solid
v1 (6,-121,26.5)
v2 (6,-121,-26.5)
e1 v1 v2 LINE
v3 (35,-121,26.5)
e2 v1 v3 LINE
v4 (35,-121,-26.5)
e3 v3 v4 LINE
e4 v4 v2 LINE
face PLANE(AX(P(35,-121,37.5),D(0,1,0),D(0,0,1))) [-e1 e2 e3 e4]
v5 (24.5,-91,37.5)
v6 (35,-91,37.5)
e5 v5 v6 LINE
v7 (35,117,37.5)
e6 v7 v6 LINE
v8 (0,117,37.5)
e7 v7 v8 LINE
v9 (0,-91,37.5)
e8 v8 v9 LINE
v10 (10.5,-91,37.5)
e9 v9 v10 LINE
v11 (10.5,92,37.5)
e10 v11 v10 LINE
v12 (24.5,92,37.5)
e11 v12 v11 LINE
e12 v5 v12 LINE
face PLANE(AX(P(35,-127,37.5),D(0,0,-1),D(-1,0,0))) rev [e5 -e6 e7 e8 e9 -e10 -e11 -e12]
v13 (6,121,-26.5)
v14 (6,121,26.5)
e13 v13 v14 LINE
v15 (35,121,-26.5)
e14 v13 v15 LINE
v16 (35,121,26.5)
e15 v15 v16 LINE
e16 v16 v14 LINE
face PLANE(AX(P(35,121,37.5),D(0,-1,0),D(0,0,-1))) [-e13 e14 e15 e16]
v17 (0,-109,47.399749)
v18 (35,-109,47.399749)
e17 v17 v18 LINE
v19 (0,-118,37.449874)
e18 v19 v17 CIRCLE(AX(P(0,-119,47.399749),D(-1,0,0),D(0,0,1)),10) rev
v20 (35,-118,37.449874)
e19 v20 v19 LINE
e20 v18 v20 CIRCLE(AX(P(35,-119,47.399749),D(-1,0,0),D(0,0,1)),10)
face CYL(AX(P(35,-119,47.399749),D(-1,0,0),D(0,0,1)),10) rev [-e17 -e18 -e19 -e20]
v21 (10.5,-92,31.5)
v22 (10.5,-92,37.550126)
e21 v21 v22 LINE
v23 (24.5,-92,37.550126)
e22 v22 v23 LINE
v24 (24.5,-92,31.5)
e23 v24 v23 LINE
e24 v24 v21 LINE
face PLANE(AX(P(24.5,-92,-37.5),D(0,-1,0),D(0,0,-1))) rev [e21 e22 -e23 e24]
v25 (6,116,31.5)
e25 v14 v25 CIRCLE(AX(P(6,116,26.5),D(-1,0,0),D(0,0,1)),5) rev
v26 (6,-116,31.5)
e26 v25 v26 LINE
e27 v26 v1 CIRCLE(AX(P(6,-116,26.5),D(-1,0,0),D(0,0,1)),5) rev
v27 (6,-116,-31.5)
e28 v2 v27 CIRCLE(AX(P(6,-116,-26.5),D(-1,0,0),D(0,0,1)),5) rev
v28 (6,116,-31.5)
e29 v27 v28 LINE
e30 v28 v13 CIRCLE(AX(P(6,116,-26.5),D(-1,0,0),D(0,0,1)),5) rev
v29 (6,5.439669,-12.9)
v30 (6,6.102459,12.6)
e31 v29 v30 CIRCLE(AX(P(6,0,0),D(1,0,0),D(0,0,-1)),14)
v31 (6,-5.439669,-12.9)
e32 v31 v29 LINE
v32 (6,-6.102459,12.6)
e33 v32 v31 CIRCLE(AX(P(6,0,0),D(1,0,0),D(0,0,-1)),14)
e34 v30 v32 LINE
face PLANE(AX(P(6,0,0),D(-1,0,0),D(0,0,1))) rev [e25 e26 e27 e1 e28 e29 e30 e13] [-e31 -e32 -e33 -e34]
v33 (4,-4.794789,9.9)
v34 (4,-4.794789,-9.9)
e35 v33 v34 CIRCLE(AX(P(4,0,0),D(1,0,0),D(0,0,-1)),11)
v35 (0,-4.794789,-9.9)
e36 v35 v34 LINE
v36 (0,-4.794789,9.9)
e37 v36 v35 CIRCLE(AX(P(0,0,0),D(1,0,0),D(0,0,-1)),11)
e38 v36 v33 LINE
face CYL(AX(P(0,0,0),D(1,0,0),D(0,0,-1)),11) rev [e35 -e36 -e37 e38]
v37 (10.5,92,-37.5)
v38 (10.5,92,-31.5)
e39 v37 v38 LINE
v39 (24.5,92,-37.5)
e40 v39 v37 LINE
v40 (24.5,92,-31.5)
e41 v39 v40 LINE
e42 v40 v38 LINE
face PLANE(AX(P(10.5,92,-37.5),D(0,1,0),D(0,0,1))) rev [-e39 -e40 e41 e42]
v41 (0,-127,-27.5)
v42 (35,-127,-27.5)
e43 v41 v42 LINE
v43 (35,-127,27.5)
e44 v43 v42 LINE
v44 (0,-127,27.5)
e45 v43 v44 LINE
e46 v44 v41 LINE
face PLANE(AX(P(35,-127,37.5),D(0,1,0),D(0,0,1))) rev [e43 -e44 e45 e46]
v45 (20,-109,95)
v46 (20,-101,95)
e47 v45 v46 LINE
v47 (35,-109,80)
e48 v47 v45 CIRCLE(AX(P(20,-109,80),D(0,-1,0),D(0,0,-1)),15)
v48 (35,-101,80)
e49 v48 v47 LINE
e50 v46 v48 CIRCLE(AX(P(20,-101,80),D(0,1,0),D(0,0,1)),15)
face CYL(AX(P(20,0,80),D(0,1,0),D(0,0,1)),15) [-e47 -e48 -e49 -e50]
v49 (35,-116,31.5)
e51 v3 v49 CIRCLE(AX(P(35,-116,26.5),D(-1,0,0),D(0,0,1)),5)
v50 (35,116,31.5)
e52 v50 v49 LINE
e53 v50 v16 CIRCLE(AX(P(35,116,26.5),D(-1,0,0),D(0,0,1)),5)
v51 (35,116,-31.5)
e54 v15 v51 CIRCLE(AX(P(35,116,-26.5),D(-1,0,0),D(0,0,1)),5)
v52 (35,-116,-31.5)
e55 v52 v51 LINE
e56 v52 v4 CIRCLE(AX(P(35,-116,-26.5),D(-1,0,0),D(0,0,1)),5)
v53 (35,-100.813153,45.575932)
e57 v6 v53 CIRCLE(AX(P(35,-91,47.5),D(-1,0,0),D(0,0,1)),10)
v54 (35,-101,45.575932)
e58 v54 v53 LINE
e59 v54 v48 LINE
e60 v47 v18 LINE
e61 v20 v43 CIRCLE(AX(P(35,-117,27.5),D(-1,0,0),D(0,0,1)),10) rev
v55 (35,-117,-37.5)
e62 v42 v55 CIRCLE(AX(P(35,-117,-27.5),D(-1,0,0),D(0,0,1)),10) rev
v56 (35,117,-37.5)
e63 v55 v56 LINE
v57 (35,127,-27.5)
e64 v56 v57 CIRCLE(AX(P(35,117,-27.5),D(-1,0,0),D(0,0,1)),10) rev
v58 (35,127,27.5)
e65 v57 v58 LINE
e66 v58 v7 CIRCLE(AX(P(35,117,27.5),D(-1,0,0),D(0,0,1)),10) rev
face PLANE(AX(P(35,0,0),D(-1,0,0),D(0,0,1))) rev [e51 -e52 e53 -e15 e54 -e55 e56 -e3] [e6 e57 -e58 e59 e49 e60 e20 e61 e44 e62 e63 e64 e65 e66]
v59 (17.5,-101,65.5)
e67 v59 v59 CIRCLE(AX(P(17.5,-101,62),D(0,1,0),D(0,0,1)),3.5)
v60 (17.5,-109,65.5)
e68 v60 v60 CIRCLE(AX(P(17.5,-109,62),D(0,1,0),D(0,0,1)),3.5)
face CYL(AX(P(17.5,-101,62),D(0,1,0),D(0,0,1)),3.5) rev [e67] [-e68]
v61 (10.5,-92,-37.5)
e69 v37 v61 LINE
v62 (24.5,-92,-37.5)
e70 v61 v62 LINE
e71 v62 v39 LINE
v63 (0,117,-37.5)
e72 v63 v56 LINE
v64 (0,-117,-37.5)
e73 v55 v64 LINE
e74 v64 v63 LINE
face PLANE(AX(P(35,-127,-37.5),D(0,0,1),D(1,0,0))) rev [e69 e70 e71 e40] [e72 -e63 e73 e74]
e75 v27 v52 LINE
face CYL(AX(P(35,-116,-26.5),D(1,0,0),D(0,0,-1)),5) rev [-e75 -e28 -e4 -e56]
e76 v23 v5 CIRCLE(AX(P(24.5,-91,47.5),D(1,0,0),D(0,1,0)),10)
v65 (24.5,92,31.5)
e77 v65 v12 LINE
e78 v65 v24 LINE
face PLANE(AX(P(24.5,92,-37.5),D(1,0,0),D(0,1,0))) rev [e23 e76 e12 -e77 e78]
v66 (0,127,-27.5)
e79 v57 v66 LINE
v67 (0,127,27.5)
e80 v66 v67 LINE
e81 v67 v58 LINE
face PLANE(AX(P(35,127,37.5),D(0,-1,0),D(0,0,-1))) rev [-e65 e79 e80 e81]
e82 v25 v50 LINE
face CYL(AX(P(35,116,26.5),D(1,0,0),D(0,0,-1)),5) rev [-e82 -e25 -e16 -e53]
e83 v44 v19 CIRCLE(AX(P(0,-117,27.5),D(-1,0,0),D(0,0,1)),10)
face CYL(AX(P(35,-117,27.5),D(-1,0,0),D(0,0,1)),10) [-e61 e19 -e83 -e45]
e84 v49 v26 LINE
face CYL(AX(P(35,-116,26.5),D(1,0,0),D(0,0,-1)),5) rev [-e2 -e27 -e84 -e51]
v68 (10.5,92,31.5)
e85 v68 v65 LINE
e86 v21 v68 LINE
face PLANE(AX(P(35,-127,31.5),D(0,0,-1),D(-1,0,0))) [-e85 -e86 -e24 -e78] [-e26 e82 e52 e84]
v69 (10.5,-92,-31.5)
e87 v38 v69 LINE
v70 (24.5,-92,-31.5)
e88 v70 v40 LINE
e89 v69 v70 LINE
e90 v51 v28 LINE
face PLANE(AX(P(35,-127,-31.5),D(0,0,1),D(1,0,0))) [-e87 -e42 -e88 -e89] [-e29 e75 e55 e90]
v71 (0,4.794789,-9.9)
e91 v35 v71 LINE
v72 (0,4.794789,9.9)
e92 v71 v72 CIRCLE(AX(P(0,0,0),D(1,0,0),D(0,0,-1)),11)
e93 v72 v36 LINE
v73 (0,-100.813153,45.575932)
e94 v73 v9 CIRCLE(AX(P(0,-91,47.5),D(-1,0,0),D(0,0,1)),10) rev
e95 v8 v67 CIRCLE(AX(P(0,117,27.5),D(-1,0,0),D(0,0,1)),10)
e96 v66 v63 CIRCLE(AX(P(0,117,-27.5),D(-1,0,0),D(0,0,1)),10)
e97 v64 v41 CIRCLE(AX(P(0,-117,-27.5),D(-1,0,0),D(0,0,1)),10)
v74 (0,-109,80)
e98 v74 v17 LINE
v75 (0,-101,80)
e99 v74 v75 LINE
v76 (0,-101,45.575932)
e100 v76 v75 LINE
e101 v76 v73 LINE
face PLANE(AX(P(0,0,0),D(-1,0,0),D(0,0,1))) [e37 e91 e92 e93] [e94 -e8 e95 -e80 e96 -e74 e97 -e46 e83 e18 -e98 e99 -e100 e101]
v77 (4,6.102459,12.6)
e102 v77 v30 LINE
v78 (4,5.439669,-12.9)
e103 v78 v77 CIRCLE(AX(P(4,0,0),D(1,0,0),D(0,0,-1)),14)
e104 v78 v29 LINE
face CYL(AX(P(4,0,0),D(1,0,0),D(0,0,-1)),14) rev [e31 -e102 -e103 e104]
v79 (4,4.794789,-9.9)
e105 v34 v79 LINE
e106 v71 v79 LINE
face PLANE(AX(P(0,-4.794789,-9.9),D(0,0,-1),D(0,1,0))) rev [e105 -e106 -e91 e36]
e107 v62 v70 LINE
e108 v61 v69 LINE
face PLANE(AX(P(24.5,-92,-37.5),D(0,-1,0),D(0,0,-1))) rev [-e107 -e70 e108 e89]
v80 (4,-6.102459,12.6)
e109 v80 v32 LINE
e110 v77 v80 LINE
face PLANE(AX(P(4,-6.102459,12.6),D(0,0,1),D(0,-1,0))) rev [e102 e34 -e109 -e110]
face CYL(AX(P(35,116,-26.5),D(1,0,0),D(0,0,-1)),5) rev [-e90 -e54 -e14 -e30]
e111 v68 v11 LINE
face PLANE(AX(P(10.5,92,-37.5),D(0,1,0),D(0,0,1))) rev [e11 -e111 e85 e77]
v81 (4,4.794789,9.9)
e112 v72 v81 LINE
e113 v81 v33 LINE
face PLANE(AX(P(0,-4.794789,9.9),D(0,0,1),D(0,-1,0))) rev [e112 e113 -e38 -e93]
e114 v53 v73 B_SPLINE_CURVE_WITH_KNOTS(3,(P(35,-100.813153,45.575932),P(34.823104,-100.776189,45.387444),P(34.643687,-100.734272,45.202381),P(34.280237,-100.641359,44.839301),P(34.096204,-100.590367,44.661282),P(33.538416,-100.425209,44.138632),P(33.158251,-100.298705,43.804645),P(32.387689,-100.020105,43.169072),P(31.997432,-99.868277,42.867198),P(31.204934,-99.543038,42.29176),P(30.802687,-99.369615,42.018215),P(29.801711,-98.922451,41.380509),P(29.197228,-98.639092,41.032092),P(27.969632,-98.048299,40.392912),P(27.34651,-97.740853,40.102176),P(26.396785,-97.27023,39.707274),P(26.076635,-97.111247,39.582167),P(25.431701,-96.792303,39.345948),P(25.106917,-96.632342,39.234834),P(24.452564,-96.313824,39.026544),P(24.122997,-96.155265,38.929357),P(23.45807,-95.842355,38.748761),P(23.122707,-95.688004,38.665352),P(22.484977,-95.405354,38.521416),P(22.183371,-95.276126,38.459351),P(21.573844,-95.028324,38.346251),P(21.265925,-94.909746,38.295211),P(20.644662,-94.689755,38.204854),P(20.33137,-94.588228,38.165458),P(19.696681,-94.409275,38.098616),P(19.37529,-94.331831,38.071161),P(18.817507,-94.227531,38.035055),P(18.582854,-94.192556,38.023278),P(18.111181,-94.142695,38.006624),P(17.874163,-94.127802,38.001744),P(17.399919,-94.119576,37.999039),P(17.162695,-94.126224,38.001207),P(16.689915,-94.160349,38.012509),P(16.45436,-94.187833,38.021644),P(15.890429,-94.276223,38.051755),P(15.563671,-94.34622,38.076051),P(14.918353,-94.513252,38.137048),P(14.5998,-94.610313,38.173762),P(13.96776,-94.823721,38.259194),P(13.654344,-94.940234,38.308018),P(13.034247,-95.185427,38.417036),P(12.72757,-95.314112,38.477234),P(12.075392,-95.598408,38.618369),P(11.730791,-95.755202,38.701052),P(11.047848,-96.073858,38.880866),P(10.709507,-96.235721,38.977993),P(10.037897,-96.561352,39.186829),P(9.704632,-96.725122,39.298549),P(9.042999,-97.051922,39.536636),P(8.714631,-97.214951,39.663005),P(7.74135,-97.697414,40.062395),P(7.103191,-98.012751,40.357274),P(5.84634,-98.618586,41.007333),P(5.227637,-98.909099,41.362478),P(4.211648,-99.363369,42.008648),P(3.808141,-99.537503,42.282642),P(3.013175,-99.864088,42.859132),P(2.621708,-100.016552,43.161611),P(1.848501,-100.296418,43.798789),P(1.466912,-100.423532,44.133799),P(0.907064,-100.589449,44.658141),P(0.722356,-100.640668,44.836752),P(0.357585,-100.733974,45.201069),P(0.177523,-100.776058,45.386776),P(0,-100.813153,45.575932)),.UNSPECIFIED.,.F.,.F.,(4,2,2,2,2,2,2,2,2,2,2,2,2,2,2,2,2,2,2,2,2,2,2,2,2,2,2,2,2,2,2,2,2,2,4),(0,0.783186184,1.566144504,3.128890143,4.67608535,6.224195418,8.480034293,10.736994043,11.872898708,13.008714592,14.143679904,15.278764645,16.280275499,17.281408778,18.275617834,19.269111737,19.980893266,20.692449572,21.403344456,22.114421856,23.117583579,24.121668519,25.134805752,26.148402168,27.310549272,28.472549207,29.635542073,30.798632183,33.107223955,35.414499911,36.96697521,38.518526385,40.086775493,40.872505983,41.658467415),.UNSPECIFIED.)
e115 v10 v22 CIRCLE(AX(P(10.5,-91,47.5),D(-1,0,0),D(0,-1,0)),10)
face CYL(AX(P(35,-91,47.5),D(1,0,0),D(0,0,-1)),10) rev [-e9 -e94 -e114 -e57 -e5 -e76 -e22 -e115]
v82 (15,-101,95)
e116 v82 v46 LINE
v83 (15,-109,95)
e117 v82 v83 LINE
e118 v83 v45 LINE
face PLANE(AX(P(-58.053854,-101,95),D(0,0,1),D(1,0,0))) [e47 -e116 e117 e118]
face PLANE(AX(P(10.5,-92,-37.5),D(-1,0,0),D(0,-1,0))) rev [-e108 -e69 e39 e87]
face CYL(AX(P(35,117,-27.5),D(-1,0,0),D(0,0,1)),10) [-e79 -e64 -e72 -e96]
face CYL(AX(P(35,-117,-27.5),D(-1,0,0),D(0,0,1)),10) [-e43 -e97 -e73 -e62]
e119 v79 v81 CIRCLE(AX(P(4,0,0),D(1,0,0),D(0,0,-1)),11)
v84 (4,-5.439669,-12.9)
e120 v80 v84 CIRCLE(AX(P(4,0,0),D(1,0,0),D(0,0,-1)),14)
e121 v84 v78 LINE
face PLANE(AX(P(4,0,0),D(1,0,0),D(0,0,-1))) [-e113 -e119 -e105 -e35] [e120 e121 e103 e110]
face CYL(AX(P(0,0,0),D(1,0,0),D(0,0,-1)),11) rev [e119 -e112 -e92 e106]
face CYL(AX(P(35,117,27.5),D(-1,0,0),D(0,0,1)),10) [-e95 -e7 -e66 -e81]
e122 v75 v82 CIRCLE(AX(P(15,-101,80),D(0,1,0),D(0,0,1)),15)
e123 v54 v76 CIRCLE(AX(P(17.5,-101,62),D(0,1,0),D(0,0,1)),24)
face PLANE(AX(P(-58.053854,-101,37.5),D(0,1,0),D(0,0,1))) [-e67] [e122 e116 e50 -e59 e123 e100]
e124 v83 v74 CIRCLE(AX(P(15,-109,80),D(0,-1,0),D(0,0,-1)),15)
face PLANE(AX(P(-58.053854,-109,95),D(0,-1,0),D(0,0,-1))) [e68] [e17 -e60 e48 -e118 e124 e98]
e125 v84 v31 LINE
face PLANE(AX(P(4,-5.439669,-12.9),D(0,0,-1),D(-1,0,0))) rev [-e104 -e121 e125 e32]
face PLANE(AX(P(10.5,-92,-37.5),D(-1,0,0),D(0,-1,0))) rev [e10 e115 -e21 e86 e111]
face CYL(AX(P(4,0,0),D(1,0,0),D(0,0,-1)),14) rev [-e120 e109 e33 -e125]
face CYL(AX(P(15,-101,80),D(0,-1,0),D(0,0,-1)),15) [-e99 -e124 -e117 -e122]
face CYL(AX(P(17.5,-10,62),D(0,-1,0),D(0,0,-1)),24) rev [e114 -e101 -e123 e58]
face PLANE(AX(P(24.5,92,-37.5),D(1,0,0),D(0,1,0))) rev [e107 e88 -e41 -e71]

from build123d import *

# Parameters (mm, degrees)
SKETCH3_W                 = 75
SKETCH3_H                 = 254
BOSS_EXTRUDE2_DEPTH       = 35
SHELL2_T                  = -6
CUT_EXTRUDE1_DEPTH        = 2
CUT_EXTRUDE2_DEPTH        = 137.000919115
SKETCH6_W                 = 14
SKETCH6_H                 = 184
CUT_EXTRUDE3_DEPTH        = 152.58825812
FILLET1_R                 = 10
FILLET2_R                 = 5
SKETCH12_W                = 57.5
SKETCH12_H                = 8
BOSS_EXTRUDE4_DEPTH       = 35
FILLET5_R                 = 10
FILLET6_R                 = 15
M8X1_0_TAPPED_HOLE1_D     = 7
M8X1_0_TAPPED_HOLE1_DEPTH = 8
M8X1_0_TAPPED_HOLE1_TIP   = 2.103012167
SKETCH16_R                = 24
CUT_EXTRUDE4_DEPTH        = 91


with BuildPart() as part:
    # Sketch3 → Boss-Extrude2 (new body)
    with BuildSketch(Plane(origin=(0, 0, 0), x_dir=(0, 0, -1), z_dir=(1, 0, 0))):
        Rectangle(SKETCH3_W, SKETCH3_H)
    extrude(amount=BOSS_EXTRUDE2_DEPTH)

    # Shell2
    shell2_openings = [part.faces().sort_by_distance(p)[0] for p in [
        (35, 0, 0),
    ]]
    offset(amount=SHELL2_T, openings=shell2_openings, kind=Kind.INTERSECTION)

    # Sketch4 → Cut-Extrude1 (cut)
    with BuildSketch(Plane(origin=(6, 0, 0), x_dir=(0, 0, -1), z_dir=(1, 0, 0))):
        with BuildLine():
            Line((12.9, -5.439669108), (12.9, 5.439669108))
            ThreePointArc((12.9, 5.439669108), (0.363761531, 13.9952734), (-12.6, 6.102458521))
            Line((-12.6, 6.102458521), (-12.6, -6.102458521))
            ThreePointArc((-12.6, -6.102458521), (0.363761531, -13.9952734), (12.9, -5.439669108))
        make_face()
    extrude(amount=-CUT_EXTRUDE1_DEPTH, mode=Mode.SUBTRACT)

    # Sketch5 → Cut-Extrude2 (cut, through all)
    with BuildSketch(Plane(origin=(4, 0, 0), x_dir=(0, 0, -1), z_dir=(1, 0, 0))):
        with BuildLine():
            Line((9.9, -4.794788838), (9.9, 4.794788838))
            ThreePointArc((9.9, 4.794788838), (0, 11), (-9.9, 4.794788838))
            Line((-9.9, 4.794788838), (-9.9, -4.794788838))
            ThreePointArc((-9.9, -4.794788838), (0, -11), (9.9, -4.794788838))
        make_face()
    extrude(amount=-CUT_EXTRUDE2_DEPTH, mode=Mode.SUBTRACT)

    # Sketch6 → Cut-Extrude3 (cut, through all)
    with BuildSketch(Plane.XY.offset(37.5)):
        with Locations((17.5, 0)):
            Rectangle(SKETCH6_W, SKETCH6_H)
    extrude(amount=-CUT_EXTRUDE3_DEPTH, mode=Mode.SUBTRACT)

    # Fillet1
    fillet1_edges = [part.edges().sort_by_distance(p)[0] for p in [
        (17.5, -127, -37.5),
        (17.5, -127, 37.5),
        (17.5, 127, 37.5),
        (17.5, 127, -37.5),
    ]]
    fillet(fillet1_edges, radius=FILLET1_R)

    # Fillet2
    fillet2_edges = [part.edges().sort_by_distance(p)[0] for p in [
        (20.5, -121, -31.5),
        (20.5, 121, -31.5),
        (20.5, 121, 31.5),
        (20.5, -121, 31.5),
    ]]
    fillet(fillet2_edges, radius=FILLET2_R)

    # Sketch12 → Boss-Extrude4 (add)
    with BuildSketch(Plane(origin=(35, 0, 0), x_dir=(0, 0, -1), z_dir=(1, 0, 0))):
        with Locations((-66.25, -105)):
            Rectangle(SKETCH12_W, SKETCH12_H)
    extrude(amount=-BOSS_EXTRUDE4_DEPTH)

    # Fillet5
    # the kernel refuses this fillet: 10 mm, written as the material it adds along each edge
    with BuildSketch(Plane(origin=(35, -109, 37.5), x_dir=(0, -0.9999844906159053, -0.0055694279462415305), z_dir=(-1, 0, 0))) as fillet5_piece_1:
        with BuildLine():
            CenterArc((9.944708969, 9.955289483), FILLET5_R, 180.319106365, 84.260829523)
            Line((-0.055135937, 9.899595203), (-1.055120428, 9.894025775))
            Line((-1.055120428, 9.894025775), (-0.999984491, -0.005569428))
            Line((-0.999984491, -0.005569428), (0.005569428, -0.999984491))
            ThreePointArc((0.005569428, -0.999984491), (8.005445353, -0.955429067), (8.905682648, -0.995528948))
            Line((8.905682648, -0.995528948), (9.000139587, 0))
        make_face()
    extrude(amount=35)
    with BuildSketch(Plane(origin=(35, -101, 37.5), x_dir=(0, 1, 0), z_dir=(-1, 0, 0))) as fillet5_piece_2_section:
        with BuildLine():
            CenterArc((FILLET5_R, -FILLET5_R), FILLET5_R, 90, 90)
            Line((0, -FILLET5_R), (0, 0))
            Line((0, 0), (FILLET5_R, 0))
        make_face()
    fillet5_piece_2 = extrude(amount=35, mode=Mode.PRIVATE)
    fillet5_piece_2 = split(fillet5_piece_2, bisect_by=Plane(origin=(29.75, -92, 37.408860849), z_dir=(0, 1, 0)), keep=Keep.TOP, mode=Mode.PRIVATE)
    fillet5_piece_2 = split(fillet5_piece_2, bisect_by=Plane(origin=(24.5, -91.519267155, 37.408860849), z_dir=(1, 0, 0)), keep=Keep.TOP, mode=Mode.PRIVATE)
    add(fillet5_piece_2)
    with BuildSketch(Plane(origin=(35, -101, 37.5), x_dir=(0, 1, 0), z_dir=(-1, 0, 0))) as fillet5_piece_3_section:
        with BuildLine():
            CenterArc((FILLET5_R, -FILLET5_R), FILLET5_R, 90, 90)
            Line((0, -FILLET5_R), (0, 0))
            Line((0, 0), (FILLET5_R, 0))
        make_face()
    fillet5_piece_3 = extrude(amount=35, mode=Mode.PRIVATE)
    fillet5_piece_3 = split(fillet5_piece_3, bisect_by=Plane(origin=(29.75, -92, 39.784135406), z_dir=(0, -1, 0)), keep=Keep.TOP, mode=Mode.PRIVATE)
    fillet5_piece_3 = split(fillet5_piece_3, bisect_by=Plane(origin=(24.5, -98.797900168, 39.784135406), z_dir=(1, 0, 0)), keep=Keep.TOP, mode=Mode.PRIVATE)
    add(fillet5_piece_3)
    with BuildSketch(Plane(origin=(35, -101, 37.5), x_dir=(0, 1, 0), z_dir=(-1, 0, 0))) as fillet5_piece_4_section:
        with BuildLine():
            CenterArc((FILLET5_R, -FILLET5_R), FILLET5_R, 90, 90)
            Line((0, -FILLET5_R), (0, 0))
            Line((0, 0), (FILLET5_R, 0))
        make_face()
    fillet5_piece_4 = extrude(amount=35, mode=Mode.PRIVATE)
    fillet5_piece_4 = split(fillet5_piece_4, bisect_by=Plane(origin=(10.5, -98.797900168, 39.784135406), z_dir=(1, 0, 0)), keep=Keep.TOP, mode=Mode.PRIVATE)
    fillet5_piece_4 = split(fillet5_piece_4, bisect_by=Plane(origin=(17.5, -92, 39.784135406), z_dir=(0, -1, 0)), keep=Keep.TOP, mode=Mode.PRIVATE)
    fillet5_piece_4 = split(fillet5_piece_4, bisect_by=Plane(origin=(24.5, -98.797900168, 39.784135406), z_dir=(-1, 0, 0)), keep=Keep.TOP, mode=Mode.PRIVATE)
    add(fillet5_piece_4)
    with BuildSketch(Plane(origin=(35, -101, 37.5), x_dir=(0, 1, 0), z_dir=(-1, 0, 0))) as fillet5_piece_5_section:
        with BuildLine():
            CenterArc((FILLET5_R, -FILLET5_R), FILLET5_R, 90, 90)
            Line((0, -FILLET5_R), (0, 0))
            Line((0, 0), (FILLET5_R, 0))
        make_face()
    fillet5_piece_5 = extrude(amount=35, mode=Mode.PRIVATE)
    fillet5_piece_5 = split(fillet5_piece_5, bisect_by=Plane(origin=(10.5, -91.519267155, 37.408860849), z_dir=(-1, 0, 0)), keep=Keep.TOP, mode=Mode.PRIVATE)
    fillet5_piece_5 = split(fillet5_piece_5, bisect_by=Plane(origin=(5.25, -92, 37.408860849), z_dir=(0, 1, 0)), keep=Keep.TOP, mode=Mode.PRIVATE)
    add(fillet5_piece_5)
    with BuildSketch(Plane(origin=(35, -101, 37.5), x_dir=(0, 1, 0), z_dir=(-1, 0, 0))) as fillet5_piece_6_section:
        with BuildLine():
            CenterArc((FILLET5_R, -FILLET5_R), FILLET5_R, 90, 90)
            Line((0, -FILLET5_R), (0, 0))
            Line((0, 0), (FILLET5_R, 0))
        make_face()
    fillet5_piece_6 = extrude(amount=35, mode=Mode.PRIVATE)
    fillet5_piece_6 = split(fillet5_piece_6, bisect_by=Plane(origin=(10.5, -98.797900168, 39.784135406), z_dir=(-1, 0, 0)), keep=Keep.TOP, mode=Mode.PRIVATE)
    fillet5_piece_6 = split(fillet5_piece_6, bisect_by=Plane(origin=(5.25, -92, 39.784135406), z_dir=(0, -1, 0)), keep=Keep.TOP, mode=Mode.PRIVATE)
    add(fillet5_piece_6)

    # Fillet6
    fillet6_edges = [part.edges().sort_by_distance(p)[0] for p in [
        (35, -105, 95),
        (0, -105, 95),
    ]]
    fillet(fillet6_edges, radius=FILLET6_R)

    # M8x1.0 Tapped Hole1
    with Locations(Plane(origin=(17.5, -101, 62), x_dir=(0, 0, 1), z_dir=(0, 1, 0))):
        with Locations((0, 0)):
            Hole(M8X1_0_TAPPED_HOLE1_D / 2, depth=M8X1_0_TAPPED_HOLE1_DEPTH)
            with Locations((0, 0, -(M8X1_0_TAPPED_HOLE1_DEPTH + M8X1_0_TAPPED_HOLE1_TIP / 2))):  # 118° drill point
                Cone(0, M8X1_0_TAPPED_HOLE1_D / 2, M8X1_0_TAPPED_HOLE1_TIP, mode=Mode.SUBTRACT)

    # Sketch16 → Cut-Extrude4 (cut)
    with BuildSketch(Plane(origin=(0, -101, 0), x_dir=(1, 0, 0), z_dir=(0, 1, 0))):
        with Locations((17.5, -62)):
            Circle(SKETCH16_R)
    extrude(amount=CUT_EXTRUDE4_DEPTH, mode=Mode.SUBTRACT)


solid = part.part
